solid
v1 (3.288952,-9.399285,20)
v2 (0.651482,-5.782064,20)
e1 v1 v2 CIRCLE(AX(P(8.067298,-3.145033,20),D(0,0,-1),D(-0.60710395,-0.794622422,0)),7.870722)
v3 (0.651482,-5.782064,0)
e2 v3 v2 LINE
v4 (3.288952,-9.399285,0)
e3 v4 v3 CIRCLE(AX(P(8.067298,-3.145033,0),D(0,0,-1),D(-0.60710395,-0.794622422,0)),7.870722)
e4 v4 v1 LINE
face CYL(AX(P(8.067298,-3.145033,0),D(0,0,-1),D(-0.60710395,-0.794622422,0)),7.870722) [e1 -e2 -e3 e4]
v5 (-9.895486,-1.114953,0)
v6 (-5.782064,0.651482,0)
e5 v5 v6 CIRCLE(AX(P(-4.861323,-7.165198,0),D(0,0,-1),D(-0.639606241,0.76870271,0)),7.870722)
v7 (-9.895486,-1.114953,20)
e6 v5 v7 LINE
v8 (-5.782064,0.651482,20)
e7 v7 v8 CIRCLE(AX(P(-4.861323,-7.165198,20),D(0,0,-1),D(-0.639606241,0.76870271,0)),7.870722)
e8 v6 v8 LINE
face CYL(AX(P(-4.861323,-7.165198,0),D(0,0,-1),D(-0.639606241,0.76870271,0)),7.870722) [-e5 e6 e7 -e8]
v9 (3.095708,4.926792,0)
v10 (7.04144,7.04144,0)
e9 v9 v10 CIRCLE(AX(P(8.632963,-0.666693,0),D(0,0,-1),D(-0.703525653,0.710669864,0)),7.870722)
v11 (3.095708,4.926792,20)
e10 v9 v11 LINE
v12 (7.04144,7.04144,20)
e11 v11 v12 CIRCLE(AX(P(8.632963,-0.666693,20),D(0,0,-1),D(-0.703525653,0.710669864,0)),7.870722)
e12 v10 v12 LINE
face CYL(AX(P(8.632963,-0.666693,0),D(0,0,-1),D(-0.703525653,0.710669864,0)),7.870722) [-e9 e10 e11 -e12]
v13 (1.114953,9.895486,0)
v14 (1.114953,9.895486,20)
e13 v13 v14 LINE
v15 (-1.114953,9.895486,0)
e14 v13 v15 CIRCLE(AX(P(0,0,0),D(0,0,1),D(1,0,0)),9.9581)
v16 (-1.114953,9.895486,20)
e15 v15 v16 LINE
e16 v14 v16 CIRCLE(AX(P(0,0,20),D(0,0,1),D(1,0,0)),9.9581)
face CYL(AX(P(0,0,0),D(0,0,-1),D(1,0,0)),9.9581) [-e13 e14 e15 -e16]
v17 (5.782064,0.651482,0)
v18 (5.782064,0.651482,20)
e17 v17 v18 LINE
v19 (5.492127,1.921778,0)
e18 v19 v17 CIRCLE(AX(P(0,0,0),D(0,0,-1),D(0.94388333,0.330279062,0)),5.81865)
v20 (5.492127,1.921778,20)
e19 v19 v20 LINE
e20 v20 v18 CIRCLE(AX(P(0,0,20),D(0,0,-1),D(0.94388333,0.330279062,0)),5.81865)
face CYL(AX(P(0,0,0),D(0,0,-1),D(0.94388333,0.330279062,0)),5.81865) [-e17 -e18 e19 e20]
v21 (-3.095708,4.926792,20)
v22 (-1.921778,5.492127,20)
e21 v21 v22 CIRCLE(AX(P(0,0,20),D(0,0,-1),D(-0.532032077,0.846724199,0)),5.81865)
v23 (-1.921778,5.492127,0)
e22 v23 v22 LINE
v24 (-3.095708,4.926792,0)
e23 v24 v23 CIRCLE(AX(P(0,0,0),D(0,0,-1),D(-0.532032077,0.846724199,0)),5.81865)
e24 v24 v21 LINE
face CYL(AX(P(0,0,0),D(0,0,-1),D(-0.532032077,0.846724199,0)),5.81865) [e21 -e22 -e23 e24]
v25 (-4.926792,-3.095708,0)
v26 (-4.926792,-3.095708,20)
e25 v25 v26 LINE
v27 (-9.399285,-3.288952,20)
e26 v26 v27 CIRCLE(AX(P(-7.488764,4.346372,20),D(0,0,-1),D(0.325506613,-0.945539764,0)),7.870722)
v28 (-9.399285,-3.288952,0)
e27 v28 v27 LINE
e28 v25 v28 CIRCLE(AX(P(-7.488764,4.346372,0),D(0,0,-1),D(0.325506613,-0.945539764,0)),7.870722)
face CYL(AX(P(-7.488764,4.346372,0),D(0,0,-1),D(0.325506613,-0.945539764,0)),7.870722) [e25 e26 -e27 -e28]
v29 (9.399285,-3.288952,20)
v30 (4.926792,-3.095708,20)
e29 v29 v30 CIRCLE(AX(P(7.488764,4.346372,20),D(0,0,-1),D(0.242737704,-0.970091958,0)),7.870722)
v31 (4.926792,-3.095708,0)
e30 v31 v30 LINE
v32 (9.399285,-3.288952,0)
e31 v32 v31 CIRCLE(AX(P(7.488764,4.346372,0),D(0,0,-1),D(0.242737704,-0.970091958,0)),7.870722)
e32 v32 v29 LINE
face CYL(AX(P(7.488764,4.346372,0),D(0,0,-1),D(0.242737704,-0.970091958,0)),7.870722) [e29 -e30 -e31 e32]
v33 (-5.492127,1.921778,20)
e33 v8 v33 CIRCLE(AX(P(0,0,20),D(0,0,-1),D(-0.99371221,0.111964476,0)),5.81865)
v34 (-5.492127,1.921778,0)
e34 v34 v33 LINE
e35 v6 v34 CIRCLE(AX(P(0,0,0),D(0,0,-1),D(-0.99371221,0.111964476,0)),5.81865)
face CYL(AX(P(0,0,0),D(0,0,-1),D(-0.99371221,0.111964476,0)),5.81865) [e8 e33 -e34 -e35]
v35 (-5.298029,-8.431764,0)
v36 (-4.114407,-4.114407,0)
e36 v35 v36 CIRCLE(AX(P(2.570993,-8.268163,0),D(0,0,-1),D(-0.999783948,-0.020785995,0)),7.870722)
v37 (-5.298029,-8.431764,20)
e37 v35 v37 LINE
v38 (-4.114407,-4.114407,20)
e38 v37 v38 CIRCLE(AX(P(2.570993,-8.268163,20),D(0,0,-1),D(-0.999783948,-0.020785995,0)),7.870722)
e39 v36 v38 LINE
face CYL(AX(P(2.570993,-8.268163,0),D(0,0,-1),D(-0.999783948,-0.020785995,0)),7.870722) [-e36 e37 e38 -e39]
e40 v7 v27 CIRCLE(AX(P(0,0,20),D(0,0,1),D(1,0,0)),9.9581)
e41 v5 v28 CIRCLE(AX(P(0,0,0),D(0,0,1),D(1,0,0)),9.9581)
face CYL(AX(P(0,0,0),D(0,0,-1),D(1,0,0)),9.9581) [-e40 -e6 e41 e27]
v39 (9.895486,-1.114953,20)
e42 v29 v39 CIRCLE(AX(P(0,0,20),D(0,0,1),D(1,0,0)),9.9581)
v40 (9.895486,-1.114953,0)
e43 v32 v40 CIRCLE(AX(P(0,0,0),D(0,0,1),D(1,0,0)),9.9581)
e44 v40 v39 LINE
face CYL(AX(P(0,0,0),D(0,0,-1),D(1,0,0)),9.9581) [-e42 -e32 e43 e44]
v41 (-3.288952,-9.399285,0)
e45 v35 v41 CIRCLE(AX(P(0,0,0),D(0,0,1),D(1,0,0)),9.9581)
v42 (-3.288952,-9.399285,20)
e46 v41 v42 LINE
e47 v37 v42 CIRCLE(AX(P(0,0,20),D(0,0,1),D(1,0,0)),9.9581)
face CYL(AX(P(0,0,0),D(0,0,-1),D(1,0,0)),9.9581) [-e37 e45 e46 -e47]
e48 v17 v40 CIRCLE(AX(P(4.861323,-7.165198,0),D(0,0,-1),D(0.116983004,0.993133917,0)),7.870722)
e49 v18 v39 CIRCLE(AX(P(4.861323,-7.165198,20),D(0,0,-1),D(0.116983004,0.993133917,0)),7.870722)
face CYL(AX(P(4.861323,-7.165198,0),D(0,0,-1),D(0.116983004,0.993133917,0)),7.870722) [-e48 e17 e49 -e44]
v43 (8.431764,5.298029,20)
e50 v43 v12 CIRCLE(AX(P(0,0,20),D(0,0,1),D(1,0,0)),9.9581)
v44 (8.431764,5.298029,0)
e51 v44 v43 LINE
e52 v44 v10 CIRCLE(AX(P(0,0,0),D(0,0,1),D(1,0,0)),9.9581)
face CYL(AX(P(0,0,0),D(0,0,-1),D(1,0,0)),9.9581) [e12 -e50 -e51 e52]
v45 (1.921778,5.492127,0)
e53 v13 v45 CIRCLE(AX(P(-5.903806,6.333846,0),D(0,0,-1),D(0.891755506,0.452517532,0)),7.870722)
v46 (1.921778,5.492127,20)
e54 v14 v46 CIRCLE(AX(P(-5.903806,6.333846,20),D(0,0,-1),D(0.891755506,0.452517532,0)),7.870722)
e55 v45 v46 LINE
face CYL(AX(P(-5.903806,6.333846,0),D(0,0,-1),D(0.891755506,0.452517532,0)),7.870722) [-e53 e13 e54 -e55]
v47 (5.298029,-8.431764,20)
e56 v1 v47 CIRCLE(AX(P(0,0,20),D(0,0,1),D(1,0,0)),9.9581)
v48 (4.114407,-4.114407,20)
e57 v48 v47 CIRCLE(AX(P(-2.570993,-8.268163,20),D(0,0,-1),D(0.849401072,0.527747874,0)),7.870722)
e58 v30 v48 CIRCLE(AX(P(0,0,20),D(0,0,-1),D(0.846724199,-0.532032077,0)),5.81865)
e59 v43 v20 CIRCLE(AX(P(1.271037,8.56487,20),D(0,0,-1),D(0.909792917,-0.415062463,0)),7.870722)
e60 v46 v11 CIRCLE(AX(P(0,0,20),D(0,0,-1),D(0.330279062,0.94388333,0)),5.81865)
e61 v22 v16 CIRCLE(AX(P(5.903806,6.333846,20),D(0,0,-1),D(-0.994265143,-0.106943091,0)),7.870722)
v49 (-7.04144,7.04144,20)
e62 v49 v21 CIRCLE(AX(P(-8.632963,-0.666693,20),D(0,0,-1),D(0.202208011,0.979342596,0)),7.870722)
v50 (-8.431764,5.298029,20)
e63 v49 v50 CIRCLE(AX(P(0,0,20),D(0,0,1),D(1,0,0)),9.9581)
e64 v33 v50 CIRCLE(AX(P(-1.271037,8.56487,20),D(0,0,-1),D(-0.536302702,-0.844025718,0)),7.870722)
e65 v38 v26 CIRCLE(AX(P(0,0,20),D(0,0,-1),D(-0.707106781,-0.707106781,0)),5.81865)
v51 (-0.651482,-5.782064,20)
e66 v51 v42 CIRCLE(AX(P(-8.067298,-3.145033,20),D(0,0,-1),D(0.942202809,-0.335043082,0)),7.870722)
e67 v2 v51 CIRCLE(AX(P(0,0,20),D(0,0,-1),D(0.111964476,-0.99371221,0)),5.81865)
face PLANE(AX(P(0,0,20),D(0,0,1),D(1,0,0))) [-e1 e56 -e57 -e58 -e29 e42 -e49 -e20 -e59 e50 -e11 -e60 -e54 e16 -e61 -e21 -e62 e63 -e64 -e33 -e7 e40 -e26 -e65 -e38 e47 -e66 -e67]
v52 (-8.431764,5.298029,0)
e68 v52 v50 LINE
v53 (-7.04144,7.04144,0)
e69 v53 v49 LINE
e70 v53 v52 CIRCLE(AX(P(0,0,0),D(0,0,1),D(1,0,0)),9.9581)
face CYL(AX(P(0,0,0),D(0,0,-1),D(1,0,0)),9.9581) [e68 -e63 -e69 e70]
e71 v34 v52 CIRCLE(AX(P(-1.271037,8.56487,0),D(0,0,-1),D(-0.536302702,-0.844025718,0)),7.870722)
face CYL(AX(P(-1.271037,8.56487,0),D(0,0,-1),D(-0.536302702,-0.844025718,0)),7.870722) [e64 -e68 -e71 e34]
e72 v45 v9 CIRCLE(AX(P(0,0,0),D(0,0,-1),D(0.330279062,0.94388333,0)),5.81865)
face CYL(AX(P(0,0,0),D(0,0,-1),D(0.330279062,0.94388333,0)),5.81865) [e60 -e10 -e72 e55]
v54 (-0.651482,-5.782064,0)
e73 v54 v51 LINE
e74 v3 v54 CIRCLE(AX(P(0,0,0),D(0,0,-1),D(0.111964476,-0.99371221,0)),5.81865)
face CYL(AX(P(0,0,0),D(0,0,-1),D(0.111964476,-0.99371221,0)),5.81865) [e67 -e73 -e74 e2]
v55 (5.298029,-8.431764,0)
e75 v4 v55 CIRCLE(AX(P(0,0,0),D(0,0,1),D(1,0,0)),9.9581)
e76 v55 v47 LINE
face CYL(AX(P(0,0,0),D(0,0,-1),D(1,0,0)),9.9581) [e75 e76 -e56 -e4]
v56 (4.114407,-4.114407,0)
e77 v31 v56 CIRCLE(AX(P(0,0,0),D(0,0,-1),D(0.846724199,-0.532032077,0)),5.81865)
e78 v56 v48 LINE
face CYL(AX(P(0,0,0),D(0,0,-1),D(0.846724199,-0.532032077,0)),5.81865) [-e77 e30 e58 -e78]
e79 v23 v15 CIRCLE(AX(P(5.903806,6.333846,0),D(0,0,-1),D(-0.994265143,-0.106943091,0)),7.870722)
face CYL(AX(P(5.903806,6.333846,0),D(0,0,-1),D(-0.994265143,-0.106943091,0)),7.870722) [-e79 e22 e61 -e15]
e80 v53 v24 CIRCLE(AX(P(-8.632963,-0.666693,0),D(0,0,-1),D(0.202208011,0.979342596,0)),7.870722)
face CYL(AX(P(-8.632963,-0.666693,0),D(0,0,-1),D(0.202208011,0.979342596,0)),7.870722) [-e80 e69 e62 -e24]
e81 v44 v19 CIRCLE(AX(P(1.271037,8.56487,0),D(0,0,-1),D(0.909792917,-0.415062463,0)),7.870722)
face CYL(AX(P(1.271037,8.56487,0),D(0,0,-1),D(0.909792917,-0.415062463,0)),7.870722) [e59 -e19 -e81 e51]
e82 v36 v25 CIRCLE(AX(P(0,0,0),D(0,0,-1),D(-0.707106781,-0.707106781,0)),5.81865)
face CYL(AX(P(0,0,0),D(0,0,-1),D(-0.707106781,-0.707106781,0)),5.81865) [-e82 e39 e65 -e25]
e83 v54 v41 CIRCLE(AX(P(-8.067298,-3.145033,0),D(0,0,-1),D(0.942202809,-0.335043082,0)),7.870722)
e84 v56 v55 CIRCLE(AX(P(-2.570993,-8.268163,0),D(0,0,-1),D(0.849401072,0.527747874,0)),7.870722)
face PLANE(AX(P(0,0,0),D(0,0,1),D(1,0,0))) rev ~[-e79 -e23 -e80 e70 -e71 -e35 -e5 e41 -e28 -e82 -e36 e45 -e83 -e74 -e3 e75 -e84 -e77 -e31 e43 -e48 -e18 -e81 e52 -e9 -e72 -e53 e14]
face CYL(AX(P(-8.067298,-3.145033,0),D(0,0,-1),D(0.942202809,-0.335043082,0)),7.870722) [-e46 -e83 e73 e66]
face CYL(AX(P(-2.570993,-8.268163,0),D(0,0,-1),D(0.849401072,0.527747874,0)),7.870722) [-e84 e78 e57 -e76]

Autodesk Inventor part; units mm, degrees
sketch "Sketch1" plane through (0, 0, 0) normal (0, 0, 1) x (1, 0, 0)
  circle A0 centre (0, 0) radius 9.9581
  dimension "d0" = 19.9162
extrude "Extrusion1" add sketch "Sketch1" along normal blind 20
ref_plane "Work Plane2" through (0, 0, 10) normal (0, 0, 1) x (1, 0, 0)
sketch "Sketch2" plane through (0, 0, 0) normal (0, 0, -1) x (-1, 0, 0)
  circle A0 centre (0, 0) radius 9.9581 projected
  circle A1 centre (0, 0) radius 7.1545
  dimension "d3" = 14.3091
surface extrude "Pitch Diameter" sketch "Sketch2" against normal through all shown no curves A1
ref_plane "Work Plane8" through (0, 0, 0) normal (0.9009689, 0.4338837, 0) x (0, 0, 1)
ref_plane "Work Plane9" through (0, 0, 0) normal (1, 0, 0) x (0, 1, 0)
spur gear teeth "Spur Gear" teeth 7 pitch diameter 14 tip diameter 19.9162 root diameter 11.6373 face width 20 start plane through (0, 0, 0) normal (0, 0, -1) x (-1, 0, 0)
equation "\"d0\" = da_da"
equation "\"d1\" = da_b"
equation "\"d3\" = da_dw"
equation "\"d16\" = da_aw"
equation "\"d43\" = da_aw"
equation "\"d46\" = da_aw"
equation "\"da_da\" = 19.916167"
equation "\"da_b\" = 20"
equation "\"da_dw\" = 14.309097"
equation "\"da_aw\" = 35.772744"
properties part number "Spur Gear1" material "Steel"
